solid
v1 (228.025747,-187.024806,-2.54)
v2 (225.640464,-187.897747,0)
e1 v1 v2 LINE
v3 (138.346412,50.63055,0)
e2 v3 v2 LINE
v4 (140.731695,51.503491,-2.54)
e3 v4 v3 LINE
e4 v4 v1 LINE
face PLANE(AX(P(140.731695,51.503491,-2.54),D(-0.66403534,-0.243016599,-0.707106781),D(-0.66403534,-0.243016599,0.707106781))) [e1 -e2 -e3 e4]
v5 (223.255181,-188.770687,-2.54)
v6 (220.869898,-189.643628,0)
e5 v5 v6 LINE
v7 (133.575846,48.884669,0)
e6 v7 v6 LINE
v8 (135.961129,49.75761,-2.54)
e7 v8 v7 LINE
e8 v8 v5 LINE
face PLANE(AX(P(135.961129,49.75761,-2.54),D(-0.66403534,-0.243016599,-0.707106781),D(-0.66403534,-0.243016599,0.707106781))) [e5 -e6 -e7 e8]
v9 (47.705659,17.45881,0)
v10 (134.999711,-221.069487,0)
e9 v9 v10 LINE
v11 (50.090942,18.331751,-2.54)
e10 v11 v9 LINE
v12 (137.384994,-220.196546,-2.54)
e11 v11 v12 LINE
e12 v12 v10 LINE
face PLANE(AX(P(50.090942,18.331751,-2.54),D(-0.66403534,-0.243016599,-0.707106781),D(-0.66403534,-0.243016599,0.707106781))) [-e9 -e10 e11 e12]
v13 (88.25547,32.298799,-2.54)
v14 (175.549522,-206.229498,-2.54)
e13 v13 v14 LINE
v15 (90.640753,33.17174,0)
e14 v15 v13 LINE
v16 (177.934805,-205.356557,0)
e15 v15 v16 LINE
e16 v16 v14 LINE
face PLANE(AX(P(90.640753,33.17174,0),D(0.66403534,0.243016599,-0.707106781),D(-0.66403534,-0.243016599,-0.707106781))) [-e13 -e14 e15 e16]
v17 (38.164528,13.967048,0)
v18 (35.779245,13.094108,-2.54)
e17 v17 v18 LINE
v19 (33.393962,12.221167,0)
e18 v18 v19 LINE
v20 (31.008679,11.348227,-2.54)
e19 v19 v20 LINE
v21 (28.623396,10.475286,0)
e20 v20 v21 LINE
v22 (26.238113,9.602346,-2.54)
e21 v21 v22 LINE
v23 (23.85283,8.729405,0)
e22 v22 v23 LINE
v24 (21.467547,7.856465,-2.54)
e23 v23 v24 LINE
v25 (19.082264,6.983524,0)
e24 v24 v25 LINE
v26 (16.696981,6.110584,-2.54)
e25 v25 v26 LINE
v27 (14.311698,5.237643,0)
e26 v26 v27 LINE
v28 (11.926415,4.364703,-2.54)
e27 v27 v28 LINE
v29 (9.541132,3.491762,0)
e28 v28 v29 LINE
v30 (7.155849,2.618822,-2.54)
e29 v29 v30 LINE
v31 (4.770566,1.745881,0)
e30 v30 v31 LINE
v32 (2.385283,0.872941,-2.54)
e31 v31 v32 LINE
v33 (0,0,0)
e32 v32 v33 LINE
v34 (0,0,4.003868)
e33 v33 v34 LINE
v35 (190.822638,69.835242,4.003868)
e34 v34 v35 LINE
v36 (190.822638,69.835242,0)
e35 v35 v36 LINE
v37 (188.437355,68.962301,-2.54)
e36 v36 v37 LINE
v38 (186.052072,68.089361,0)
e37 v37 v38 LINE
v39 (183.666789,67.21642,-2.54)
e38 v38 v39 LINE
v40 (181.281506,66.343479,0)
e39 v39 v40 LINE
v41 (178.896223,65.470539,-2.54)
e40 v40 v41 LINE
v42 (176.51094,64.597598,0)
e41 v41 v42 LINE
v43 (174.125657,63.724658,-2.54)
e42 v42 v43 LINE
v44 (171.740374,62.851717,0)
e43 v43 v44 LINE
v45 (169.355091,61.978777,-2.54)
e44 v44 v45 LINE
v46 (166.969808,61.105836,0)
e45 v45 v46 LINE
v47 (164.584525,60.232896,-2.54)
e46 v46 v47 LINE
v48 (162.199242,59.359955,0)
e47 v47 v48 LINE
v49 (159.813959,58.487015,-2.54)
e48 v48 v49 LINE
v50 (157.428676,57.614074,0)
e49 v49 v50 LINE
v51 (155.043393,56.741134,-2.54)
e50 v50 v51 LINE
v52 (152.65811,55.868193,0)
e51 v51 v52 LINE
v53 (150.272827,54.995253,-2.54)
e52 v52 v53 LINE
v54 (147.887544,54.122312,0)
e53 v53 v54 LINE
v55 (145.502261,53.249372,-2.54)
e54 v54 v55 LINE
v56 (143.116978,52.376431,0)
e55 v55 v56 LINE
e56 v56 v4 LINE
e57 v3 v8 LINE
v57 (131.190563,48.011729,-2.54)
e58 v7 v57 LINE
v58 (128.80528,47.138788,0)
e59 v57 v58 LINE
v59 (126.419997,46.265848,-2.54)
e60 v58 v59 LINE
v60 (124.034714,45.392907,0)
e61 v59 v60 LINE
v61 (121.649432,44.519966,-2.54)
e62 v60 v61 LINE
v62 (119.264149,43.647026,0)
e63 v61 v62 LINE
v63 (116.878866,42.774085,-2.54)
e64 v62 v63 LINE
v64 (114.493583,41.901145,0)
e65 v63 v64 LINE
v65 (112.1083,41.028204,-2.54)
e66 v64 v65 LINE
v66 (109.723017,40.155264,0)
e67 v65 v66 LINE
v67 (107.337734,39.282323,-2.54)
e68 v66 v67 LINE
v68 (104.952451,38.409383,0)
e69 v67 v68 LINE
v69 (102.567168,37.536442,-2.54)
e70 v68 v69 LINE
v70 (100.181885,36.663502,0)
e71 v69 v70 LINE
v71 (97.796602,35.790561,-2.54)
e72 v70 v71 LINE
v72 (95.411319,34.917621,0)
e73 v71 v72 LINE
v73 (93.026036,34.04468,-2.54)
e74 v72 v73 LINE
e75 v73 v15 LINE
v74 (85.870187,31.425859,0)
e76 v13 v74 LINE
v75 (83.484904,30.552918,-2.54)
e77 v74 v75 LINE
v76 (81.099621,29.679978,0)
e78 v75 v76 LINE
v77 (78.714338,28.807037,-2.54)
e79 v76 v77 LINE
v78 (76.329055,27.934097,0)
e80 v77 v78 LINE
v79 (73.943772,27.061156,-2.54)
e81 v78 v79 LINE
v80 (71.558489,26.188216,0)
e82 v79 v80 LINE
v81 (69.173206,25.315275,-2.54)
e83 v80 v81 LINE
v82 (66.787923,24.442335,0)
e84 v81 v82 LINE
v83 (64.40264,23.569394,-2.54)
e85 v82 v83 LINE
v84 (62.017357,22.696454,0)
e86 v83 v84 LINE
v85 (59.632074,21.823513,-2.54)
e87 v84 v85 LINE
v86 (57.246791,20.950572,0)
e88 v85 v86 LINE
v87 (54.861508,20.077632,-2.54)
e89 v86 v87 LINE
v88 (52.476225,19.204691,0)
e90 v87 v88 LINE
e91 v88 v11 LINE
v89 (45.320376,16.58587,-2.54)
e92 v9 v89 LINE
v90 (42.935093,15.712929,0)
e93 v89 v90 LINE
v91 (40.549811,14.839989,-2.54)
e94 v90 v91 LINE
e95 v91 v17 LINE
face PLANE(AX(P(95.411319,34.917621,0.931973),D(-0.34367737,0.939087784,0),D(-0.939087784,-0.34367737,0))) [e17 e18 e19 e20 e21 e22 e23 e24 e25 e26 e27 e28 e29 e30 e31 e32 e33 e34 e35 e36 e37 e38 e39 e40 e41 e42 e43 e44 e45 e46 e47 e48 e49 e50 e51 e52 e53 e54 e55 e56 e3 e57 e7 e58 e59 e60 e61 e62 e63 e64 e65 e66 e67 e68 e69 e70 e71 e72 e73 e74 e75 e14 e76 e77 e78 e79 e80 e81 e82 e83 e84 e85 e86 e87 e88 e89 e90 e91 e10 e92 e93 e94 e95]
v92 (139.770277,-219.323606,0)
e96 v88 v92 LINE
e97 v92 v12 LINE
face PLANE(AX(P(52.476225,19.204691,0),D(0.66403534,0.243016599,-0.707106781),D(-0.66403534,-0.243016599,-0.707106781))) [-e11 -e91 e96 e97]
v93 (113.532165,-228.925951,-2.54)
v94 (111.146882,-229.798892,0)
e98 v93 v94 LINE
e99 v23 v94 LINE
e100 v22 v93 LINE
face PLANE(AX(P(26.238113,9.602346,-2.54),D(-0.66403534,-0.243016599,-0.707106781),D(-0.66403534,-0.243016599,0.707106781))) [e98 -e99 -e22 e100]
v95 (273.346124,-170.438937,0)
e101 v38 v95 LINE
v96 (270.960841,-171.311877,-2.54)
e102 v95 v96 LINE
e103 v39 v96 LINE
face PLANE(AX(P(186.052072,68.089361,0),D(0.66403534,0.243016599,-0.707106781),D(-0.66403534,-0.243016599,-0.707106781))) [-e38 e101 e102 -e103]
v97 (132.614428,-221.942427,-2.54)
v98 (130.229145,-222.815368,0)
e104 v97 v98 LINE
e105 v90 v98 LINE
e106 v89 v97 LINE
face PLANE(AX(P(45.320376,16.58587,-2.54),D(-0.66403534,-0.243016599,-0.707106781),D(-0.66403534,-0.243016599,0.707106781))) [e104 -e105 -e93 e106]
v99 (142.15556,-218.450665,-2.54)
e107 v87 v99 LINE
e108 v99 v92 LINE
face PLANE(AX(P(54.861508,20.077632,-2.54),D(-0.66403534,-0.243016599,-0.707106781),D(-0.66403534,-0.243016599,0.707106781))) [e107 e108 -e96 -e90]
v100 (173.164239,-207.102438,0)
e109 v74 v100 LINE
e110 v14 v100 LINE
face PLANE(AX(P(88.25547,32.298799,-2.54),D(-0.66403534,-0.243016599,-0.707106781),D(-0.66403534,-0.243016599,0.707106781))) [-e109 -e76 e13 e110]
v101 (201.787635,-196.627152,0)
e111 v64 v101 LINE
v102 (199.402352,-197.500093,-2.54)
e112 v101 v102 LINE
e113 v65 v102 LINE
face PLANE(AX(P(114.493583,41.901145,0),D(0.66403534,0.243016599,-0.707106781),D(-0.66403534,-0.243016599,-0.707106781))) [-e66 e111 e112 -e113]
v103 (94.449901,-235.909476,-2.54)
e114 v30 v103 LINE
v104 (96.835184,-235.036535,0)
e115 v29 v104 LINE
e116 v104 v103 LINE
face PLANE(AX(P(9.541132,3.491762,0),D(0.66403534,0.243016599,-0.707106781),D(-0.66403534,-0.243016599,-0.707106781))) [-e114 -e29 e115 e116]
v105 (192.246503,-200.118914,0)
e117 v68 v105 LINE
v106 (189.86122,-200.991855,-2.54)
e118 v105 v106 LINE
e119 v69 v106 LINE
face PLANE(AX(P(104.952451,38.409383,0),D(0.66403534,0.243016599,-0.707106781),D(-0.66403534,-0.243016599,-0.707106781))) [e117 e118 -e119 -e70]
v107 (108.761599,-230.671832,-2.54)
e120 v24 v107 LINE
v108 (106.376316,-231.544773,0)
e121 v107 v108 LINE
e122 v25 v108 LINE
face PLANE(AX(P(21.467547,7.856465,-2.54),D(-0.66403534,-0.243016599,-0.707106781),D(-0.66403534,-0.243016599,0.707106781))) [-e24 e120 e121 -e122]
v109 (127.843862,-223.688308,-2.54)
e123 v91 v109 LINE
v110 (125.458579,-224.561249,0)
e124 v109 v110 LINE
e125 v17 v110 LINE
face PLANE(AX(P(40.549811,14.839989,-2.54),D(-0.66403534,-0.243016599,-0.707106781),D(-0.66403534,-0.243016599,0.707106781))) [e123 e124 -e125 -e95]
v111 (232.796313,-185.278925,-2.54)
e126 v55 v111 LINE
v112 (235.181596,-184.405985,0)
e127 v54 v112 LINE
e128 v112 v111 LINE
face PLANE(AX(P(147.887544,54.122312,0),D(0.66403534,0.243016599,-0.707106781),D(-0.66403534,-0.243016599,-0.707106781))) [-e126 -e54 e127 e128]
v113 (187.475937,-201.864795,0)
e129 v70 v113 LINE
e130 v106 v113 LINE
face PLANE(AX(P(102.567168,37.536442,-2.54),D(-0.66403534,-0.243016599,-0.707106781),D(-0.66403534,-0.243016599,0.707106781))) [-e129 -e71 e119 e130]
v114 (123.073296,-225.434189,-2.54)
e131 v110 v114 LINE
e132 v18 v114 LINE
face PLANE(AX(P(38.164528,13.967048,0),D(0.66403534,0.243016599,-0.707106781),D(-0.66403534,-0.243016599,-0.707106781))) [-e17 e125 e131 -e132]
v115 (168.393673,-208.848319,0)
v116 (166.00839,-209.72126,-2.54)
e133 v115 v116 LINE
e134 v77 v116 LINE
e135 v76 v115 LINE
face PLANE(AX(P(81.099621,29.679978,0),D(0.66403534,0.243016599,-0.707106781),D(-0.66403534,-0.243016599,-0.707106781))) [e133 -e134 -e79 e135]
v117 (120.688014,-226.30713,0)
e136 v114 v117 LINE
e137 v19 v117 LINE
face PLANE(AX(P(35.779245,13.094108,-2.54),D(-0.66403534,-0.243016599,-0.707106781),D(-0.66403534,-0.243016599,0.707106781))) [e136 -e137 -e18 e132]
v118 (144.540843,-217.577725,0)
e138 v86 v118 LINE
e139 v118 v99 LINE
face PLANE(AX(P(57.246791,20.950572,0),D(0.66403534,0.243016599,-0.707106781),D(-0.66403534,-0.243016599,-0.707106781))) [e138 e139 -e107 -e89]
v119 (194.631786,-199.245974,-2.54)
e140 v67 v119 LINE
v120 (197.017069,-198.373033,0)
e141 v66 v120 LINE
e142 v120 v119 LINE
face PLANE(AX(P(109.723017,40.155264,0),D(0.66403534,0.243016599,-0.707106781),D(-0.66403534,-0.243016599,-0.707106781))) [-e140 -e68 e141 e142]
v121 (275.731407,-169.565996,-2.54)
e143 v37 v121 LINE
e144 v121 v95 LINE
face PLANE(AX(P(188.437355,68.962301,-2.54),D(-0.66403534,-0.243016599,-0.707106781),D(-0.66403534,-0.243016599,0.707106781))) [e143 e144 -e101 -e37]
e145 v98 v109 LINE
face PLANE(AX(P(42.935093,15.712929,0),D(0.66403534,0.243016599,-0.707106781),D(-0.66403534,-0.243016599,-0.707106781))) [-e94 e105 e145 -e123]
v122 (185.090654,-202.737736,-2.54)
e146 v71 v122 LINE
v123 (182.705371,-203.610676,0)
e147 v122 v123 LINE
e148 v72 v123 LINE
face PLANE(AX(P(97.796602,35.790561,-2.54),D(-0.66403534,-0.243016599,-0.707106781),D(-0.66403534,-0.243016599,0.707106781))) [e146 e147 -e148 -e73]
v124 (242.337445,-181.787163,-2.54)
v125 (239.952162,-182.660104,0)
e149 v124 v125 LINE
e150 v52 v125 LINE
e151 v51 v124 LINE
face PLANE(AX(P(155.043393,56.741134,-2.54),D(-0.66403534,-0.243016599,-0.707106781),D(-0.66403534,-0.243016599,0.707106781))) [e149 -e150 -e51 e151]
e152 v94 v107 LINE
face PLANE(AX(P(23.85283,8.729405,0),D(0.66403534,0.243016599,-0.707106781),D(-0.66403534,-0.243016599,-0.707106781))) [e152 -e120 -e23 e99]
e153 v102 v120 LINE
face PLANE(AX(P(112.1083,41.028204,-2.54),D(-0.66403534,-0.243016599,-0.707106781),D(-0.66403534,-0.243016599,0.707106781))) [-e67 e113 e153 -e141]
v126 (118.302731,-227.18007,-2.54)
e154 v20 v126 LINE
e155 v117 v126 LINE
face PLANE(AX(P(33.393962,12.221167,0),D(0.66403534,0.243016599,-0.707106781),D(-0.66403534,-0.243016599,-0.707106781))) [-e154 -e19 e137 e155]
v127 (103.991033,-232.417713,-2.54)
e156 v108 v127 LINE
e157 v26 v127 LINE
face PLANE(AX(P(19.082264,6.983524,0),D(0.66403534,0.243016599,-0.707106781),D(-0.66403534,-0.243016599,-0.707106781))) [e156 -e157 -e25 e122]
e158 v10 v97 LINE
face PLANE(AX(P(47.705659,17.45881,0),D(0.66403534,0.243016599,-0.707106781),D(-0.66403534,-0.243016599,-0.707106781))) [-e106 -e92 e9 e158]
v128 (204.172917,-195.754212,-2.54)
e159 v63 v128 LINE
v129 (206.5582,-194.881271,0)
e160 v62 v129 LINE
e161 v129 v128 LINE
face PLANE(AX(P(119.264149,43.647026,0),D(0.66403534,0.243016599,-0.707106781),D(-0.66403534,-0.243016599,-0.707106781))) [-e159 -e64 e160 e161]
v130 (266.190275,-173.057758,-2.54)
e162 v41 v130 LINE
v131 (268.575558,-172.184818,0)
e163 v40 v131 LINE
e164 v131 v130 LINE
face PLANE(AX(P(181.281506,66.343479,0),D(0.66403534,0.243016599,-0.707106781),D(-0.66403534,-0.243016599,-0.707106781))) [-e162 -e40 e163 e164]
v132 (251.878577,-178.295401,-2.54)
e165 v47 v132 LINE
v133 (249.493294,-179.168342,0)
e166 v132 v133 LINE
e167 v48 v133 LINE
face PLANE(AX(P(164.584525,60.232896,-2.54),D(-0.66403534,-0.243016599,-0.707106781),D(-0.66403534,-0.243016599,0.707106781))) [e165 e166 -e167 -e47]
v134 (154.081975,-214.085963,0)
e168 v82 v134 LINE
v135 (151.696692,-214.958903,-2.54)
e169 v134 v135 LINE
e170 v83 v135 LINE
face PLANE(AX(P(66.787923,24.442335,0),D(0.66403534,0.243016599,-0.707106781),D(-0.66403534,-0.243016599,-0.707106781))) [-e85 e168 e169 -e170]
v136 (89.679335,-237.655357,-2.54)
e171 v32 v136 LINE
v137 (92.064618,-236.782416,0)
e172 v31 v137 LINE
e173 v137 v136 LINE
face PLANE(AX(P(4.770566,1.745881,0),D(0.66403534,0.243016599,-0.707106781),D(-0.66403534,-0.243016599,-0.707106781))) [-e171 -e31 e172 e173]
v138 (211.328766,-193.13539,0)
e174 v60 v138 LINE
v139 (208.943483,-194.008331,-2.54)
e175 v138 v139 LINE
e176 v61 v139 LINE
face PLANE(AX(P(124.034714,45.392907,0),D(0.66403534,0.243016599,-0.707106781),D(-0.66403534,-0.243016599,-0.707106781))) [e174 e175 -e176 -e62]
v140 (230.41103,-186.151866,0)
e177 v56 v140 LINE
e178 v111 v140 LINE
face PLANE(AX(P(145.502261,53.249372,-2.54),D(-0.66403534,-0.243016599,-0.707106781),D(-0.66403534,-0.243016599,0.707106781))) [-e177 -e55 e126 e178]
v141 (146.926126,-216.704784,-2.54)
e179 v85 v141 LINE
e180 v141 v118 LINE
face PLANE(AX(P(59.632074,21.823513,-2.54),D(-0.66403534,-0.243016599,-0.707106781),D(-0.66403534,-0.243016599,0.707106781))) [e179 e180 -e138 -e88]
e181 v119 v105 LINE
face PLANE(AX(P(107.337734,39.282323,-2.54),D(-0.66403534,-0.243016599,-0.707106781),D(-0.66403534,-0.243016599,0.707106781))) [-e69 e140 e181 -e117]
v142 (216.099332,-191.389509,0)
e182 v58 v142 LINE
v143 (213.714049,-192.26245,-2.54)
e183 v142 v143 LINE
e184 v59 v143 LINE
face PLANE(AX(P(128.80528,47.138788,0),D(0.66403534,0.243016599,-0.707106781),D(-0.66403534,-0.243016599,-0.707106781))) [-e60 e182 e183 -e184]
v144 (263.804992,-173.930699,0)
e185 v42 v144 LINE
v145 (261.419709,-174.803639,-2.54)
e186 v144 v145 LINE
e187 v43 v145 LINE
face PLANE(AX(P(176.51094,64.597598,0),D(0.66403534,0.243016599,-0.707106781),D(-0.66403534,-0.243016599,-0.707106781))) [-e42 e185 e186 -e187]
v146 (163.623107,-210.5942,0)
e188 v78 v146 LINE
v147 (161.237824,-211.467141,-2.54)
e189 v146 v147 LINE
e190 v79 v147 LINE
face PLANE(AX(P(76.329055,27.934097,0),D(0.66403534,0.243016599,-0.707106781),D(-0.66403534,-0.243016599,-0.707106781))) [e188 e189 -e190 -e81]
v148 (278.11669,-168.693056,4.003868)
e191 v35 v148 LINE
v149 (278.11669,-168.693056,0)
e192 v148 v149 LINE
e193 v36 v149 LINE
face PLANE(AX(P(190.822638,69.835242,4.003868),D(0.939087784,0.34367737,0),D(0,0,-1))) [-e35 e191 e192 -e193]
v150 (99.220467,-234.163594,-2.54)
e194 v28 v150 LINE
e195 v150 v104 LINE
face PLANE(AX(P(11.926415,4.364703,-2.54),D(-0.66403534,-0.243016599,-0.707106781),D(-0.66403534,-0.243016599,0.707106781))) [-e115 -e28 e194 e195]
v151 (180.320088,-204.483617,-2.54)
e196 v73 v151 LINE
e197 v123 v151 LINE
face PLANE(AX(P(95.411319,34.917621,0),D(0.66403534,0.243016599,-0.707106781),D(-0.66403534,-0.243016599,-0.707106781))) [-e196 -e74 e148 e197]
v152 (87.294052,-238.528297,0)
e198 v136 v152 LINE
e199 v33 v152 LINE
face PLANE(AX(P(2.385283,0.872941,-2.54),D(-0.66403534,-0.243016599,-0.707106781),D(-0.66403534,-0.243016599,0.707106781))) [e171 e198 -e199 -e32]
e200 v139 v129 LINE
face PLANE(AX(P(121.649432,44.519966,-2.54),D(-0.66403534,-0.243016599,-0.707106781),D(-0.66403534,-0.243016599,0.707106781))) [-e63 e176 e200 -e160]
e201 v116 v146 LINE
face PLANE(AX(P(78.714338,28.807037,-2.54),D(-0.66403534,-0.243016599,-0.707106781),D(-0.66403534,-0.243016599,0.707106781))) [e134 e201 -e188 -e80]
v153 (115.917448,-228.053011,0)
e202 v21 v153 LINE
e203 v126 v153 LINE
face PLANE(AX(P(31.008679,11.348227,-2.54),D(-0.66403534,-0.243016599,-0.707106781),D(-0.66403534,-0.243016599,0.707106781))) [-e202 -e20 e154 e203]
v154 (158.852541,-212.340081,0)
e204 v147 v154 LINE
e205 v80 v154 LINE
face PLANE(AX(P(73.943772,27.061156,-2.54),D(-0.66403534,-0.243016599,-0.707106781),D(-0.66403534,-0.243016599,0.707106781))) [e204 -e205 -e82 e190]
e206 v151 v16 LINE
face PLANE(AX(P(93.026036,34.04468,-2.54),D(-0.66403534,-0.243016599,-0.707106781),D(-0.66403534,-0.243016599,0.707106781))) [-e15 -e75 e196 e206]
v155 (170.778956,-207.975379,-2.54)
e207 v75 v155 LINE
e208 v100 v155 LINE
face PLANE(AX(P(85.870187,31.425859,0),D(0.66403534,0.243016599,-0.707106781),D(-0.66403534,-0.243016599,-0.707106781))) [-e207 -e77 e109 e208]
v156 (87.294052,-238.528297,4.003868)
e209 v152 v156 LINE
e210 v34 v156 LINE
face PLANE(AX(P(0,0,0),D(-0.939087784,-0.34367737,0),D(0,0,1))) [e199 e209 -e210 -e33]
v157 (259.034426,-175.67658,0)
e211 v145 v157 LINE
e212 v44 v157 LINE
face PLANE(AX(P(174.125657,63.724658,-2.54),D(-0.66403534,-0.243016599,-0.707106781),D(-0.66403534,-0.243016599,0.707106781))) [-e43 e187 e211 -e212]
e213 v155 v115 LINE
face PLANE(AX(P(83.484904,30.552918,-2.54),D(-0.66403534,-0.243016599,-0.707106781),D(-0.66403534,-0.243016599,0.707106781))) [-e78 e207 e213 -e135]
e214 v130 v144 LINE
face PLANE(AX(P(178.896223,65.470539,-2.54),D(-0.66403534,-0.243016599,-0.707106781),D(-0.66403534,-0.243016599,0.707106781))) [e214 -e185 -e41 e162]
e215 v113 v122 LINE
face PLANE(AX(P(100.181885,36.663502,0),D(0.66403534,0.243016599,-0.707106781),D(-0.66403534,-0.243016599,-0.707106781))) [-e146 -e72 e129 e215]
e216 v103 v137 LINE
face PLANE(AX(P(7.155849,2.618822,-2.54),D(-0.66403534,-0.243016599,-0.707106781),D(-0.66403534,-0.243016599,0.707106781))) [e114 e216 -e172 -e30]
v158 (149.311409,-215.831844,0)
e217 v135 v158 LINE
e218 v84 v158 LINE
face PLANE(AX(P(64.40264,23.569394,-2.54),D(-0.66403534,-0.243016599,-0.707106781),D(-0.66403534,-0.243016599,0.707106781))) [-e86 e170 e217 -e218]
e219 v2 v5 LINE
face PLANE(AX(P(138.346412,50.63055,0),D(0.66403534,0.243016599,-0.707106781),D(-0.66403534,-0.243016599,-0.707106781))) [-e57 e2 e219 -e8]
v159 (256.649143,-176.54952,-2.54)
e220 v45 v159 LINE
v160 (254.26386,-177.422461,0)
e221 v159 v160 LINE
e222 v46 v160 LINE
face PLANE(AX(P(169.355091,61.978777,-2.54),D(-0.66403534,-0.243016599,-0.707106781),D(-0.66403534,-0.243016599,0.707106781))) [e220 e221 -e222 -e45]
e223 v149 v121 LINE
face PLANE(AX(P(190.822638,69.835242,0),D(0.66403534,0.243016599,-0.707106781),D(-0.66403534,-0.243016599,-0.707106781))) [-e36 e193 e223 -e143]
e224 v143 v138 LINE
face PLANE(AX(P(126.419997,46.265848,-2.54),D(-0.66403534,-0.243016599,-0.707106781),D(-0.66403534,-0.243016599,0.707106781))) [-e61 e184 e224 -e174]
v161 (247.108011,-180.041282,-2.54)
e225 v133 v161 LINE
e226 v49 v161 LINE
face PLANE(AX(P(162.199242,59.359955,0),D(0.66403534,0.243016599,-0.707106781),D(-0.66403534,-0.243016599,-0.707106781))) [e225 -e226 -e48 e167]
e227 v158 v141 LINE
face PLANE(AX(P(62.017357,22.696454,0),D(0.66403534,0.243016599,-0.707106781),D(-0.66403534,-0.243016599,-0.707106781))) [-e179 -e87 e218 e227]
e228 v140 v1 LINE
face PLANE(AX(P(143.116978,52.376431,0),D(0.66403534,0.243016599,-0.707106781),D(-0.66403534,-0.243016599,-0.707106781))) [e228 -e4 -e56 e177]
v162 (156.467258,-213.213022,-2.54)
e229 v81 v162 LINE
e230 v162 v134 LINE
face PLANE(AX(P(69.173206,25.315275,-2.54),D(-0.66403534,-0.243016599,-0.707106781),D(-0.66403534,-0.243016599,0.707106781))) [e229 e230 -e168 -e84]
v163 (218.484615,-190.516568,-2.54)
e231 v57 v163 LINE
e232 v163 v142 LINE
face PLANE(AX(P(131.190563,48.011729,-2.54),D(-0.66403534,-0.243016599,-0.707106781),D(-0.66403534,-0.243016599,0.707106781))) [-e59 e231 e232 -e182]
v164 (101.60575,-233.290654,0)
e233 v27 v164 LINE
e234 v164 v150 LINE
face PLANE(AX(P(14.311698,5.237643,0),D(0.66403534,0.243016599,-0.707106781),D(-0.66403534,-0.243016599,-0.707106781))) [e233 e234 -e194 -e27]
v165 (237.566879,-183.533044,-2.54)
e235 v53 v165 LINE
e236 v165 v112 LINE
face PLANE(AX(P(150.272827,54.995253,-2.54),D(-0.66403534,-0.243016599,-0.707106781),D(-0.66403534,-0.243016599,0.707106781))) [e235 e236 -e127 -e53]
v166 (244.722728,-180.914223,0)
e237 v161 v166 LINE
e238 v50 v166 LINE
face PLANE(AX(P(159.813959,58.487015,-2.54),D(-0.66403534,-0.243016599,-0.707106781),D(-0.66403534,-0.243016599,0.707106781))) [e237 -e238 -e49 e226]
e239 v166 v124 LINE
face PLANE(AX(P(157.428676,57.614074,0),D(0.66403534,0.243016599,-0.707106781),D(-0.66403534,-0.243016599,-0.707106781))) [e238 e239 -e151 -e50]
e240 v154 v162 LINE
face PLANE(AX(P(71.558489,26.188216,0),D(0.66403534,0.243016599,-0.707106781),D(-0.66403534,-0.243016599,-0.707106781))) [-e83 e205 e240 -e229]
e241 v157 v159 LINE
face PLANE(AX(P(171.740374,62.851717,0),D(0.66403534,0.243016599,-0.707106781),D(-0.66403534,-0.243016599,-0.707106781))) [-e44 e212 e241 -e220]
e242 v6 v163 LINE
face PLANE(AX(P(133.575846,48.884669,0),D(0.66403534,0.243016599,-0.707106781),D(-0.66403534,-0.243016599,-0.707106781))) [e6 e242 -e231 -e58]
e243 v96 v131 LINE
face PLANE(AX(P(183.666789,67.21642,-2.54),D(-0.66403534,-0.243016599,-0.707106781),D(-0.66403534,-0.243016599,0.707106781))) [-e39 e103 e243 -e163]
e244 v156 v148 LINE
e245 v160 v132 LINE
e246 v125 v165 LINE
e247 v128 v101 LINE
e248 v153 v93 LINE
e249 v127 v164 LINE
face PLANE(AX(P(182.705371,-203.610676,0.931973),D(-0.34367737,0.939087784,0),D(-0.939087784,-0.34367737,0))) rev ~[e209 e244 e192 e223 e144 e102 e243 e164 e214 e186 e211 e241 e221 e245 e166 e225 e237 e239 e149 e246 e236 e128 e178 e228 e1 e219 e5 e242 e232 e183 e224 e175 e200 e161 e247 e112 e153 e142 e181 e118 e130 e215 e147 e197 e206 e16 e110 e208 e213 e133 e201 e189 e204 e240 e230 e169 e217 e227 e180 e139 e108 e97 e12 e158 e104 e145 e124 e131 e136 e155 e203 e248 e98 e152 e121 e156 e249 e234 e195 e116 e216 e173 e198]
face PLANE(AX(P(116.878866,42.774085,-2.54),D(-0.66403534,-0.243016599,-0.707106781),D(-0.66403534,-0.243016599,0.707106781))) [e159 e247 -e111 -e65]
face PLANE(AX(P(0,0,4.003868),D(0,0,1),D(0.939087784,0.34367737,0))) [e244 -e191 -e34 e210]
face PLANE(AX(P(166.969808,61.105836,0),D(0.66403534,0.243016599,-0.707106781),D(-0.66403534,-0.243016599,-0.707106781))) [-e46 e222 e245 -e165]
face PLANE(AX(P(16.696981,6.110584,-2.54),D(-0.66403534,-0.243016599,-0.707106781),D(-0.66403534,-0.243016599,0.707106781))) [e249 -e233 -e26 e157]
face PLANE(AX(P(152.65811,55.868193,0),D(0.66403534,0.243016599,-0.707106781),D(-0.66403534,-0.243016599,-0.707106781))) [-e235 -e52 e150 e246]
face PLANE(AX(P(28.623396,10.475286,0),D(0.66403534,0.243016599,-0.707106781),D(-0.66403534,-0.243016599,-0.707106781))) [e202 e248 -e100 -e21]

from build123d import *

# Parameters (mm, degrees)
F3_DEPTH = 254


# Not quite as in the source:
# - a feature of the source that left no trace in its solid (it failed there, or was rolled back) is left out


with BuildPart() as f3:
    # F2 (on face) → F3 (new body)
    with BuildSketch(Plane(origin=(0, 0, 0), x_dir=(-0.9390877837, -0.3436773698, 0), z_dir=(-0.3436773698, 0.9390877837, 0))):
        Polygon((-2.54, -2.54), (0, 0), (0, 4.0038675896), (-203.2, 4.0038675896), (-203.2, 0), (-200.66, -2.54), (-198.12, 0), (-195.58, -2.54), (-193.04, 0), (-190.5, -2.54), (-187.96, 0), (-185.42, -2.54), (-182.88, 0), (-180.34, -2.54), (-177.8, 0), (-175.26, -2.54), (-172.72, 0), (-170.18, -2.54), (-167.64, 0), (-165.1, -2.54), (-162.56, 0), (-160.02, -2.54), (-157.48, 0), (-154.94, -2.54), (-152.4, 0), (-149.86, -2.54), (-147.32, 0), (-144.78, -2.54), (-142.24, 0), (-139.7, -2.54), (-137.16, 0), (-134.62, -2.54), (-132.08, 0), (-129.54, -2.54), (-127, 0), (-124.46, -2.54), (-121.92, 0), (-119.38, -2.54), (-116.84, 0), (-114.3, -2.54), (-111.76, 0), (-109.22, -2.54), (-106.68, 0), (-104.14, -2.54), (-101.6, 0), (-99.06, -2.54), (-96.52, 0), (-93.98, -2.54), (-91.44, 0), (-88.9, -2.54), (-86.36, 0), (-83.82, -2.54), (-81.28, 0), (-78.74, -2.54), (-76.2, 0), (-73.66, -2.54), (-71.12, 0), (-68.58, -2.54), (-66.04, 0), (-63.5, -2.54), (-60.96, 0), (-58.42, -2.54), (-55.88, 0), (-53.34, -2.54), (-50.8, 0), (-48.26, -2.54), (-45.72, 0), (-43.18, -2.54), (-40.64, 0), (-38.1, -2.54), (-35.56, 0), (-33.02, -2.54), (-30.48, 0), (-27.94, -2.54), (-25.4, 0), (-22.86, -2.54), (-20.32, 0), (-17.78, -2.54), (-15.24, 0), (-12.7, -2.54), (-10.16, 0), (-7.62, -2.54), (-5.08, 0), align=None)
    extrude(amount=-F3_DEPTH)


solid = f3.part
